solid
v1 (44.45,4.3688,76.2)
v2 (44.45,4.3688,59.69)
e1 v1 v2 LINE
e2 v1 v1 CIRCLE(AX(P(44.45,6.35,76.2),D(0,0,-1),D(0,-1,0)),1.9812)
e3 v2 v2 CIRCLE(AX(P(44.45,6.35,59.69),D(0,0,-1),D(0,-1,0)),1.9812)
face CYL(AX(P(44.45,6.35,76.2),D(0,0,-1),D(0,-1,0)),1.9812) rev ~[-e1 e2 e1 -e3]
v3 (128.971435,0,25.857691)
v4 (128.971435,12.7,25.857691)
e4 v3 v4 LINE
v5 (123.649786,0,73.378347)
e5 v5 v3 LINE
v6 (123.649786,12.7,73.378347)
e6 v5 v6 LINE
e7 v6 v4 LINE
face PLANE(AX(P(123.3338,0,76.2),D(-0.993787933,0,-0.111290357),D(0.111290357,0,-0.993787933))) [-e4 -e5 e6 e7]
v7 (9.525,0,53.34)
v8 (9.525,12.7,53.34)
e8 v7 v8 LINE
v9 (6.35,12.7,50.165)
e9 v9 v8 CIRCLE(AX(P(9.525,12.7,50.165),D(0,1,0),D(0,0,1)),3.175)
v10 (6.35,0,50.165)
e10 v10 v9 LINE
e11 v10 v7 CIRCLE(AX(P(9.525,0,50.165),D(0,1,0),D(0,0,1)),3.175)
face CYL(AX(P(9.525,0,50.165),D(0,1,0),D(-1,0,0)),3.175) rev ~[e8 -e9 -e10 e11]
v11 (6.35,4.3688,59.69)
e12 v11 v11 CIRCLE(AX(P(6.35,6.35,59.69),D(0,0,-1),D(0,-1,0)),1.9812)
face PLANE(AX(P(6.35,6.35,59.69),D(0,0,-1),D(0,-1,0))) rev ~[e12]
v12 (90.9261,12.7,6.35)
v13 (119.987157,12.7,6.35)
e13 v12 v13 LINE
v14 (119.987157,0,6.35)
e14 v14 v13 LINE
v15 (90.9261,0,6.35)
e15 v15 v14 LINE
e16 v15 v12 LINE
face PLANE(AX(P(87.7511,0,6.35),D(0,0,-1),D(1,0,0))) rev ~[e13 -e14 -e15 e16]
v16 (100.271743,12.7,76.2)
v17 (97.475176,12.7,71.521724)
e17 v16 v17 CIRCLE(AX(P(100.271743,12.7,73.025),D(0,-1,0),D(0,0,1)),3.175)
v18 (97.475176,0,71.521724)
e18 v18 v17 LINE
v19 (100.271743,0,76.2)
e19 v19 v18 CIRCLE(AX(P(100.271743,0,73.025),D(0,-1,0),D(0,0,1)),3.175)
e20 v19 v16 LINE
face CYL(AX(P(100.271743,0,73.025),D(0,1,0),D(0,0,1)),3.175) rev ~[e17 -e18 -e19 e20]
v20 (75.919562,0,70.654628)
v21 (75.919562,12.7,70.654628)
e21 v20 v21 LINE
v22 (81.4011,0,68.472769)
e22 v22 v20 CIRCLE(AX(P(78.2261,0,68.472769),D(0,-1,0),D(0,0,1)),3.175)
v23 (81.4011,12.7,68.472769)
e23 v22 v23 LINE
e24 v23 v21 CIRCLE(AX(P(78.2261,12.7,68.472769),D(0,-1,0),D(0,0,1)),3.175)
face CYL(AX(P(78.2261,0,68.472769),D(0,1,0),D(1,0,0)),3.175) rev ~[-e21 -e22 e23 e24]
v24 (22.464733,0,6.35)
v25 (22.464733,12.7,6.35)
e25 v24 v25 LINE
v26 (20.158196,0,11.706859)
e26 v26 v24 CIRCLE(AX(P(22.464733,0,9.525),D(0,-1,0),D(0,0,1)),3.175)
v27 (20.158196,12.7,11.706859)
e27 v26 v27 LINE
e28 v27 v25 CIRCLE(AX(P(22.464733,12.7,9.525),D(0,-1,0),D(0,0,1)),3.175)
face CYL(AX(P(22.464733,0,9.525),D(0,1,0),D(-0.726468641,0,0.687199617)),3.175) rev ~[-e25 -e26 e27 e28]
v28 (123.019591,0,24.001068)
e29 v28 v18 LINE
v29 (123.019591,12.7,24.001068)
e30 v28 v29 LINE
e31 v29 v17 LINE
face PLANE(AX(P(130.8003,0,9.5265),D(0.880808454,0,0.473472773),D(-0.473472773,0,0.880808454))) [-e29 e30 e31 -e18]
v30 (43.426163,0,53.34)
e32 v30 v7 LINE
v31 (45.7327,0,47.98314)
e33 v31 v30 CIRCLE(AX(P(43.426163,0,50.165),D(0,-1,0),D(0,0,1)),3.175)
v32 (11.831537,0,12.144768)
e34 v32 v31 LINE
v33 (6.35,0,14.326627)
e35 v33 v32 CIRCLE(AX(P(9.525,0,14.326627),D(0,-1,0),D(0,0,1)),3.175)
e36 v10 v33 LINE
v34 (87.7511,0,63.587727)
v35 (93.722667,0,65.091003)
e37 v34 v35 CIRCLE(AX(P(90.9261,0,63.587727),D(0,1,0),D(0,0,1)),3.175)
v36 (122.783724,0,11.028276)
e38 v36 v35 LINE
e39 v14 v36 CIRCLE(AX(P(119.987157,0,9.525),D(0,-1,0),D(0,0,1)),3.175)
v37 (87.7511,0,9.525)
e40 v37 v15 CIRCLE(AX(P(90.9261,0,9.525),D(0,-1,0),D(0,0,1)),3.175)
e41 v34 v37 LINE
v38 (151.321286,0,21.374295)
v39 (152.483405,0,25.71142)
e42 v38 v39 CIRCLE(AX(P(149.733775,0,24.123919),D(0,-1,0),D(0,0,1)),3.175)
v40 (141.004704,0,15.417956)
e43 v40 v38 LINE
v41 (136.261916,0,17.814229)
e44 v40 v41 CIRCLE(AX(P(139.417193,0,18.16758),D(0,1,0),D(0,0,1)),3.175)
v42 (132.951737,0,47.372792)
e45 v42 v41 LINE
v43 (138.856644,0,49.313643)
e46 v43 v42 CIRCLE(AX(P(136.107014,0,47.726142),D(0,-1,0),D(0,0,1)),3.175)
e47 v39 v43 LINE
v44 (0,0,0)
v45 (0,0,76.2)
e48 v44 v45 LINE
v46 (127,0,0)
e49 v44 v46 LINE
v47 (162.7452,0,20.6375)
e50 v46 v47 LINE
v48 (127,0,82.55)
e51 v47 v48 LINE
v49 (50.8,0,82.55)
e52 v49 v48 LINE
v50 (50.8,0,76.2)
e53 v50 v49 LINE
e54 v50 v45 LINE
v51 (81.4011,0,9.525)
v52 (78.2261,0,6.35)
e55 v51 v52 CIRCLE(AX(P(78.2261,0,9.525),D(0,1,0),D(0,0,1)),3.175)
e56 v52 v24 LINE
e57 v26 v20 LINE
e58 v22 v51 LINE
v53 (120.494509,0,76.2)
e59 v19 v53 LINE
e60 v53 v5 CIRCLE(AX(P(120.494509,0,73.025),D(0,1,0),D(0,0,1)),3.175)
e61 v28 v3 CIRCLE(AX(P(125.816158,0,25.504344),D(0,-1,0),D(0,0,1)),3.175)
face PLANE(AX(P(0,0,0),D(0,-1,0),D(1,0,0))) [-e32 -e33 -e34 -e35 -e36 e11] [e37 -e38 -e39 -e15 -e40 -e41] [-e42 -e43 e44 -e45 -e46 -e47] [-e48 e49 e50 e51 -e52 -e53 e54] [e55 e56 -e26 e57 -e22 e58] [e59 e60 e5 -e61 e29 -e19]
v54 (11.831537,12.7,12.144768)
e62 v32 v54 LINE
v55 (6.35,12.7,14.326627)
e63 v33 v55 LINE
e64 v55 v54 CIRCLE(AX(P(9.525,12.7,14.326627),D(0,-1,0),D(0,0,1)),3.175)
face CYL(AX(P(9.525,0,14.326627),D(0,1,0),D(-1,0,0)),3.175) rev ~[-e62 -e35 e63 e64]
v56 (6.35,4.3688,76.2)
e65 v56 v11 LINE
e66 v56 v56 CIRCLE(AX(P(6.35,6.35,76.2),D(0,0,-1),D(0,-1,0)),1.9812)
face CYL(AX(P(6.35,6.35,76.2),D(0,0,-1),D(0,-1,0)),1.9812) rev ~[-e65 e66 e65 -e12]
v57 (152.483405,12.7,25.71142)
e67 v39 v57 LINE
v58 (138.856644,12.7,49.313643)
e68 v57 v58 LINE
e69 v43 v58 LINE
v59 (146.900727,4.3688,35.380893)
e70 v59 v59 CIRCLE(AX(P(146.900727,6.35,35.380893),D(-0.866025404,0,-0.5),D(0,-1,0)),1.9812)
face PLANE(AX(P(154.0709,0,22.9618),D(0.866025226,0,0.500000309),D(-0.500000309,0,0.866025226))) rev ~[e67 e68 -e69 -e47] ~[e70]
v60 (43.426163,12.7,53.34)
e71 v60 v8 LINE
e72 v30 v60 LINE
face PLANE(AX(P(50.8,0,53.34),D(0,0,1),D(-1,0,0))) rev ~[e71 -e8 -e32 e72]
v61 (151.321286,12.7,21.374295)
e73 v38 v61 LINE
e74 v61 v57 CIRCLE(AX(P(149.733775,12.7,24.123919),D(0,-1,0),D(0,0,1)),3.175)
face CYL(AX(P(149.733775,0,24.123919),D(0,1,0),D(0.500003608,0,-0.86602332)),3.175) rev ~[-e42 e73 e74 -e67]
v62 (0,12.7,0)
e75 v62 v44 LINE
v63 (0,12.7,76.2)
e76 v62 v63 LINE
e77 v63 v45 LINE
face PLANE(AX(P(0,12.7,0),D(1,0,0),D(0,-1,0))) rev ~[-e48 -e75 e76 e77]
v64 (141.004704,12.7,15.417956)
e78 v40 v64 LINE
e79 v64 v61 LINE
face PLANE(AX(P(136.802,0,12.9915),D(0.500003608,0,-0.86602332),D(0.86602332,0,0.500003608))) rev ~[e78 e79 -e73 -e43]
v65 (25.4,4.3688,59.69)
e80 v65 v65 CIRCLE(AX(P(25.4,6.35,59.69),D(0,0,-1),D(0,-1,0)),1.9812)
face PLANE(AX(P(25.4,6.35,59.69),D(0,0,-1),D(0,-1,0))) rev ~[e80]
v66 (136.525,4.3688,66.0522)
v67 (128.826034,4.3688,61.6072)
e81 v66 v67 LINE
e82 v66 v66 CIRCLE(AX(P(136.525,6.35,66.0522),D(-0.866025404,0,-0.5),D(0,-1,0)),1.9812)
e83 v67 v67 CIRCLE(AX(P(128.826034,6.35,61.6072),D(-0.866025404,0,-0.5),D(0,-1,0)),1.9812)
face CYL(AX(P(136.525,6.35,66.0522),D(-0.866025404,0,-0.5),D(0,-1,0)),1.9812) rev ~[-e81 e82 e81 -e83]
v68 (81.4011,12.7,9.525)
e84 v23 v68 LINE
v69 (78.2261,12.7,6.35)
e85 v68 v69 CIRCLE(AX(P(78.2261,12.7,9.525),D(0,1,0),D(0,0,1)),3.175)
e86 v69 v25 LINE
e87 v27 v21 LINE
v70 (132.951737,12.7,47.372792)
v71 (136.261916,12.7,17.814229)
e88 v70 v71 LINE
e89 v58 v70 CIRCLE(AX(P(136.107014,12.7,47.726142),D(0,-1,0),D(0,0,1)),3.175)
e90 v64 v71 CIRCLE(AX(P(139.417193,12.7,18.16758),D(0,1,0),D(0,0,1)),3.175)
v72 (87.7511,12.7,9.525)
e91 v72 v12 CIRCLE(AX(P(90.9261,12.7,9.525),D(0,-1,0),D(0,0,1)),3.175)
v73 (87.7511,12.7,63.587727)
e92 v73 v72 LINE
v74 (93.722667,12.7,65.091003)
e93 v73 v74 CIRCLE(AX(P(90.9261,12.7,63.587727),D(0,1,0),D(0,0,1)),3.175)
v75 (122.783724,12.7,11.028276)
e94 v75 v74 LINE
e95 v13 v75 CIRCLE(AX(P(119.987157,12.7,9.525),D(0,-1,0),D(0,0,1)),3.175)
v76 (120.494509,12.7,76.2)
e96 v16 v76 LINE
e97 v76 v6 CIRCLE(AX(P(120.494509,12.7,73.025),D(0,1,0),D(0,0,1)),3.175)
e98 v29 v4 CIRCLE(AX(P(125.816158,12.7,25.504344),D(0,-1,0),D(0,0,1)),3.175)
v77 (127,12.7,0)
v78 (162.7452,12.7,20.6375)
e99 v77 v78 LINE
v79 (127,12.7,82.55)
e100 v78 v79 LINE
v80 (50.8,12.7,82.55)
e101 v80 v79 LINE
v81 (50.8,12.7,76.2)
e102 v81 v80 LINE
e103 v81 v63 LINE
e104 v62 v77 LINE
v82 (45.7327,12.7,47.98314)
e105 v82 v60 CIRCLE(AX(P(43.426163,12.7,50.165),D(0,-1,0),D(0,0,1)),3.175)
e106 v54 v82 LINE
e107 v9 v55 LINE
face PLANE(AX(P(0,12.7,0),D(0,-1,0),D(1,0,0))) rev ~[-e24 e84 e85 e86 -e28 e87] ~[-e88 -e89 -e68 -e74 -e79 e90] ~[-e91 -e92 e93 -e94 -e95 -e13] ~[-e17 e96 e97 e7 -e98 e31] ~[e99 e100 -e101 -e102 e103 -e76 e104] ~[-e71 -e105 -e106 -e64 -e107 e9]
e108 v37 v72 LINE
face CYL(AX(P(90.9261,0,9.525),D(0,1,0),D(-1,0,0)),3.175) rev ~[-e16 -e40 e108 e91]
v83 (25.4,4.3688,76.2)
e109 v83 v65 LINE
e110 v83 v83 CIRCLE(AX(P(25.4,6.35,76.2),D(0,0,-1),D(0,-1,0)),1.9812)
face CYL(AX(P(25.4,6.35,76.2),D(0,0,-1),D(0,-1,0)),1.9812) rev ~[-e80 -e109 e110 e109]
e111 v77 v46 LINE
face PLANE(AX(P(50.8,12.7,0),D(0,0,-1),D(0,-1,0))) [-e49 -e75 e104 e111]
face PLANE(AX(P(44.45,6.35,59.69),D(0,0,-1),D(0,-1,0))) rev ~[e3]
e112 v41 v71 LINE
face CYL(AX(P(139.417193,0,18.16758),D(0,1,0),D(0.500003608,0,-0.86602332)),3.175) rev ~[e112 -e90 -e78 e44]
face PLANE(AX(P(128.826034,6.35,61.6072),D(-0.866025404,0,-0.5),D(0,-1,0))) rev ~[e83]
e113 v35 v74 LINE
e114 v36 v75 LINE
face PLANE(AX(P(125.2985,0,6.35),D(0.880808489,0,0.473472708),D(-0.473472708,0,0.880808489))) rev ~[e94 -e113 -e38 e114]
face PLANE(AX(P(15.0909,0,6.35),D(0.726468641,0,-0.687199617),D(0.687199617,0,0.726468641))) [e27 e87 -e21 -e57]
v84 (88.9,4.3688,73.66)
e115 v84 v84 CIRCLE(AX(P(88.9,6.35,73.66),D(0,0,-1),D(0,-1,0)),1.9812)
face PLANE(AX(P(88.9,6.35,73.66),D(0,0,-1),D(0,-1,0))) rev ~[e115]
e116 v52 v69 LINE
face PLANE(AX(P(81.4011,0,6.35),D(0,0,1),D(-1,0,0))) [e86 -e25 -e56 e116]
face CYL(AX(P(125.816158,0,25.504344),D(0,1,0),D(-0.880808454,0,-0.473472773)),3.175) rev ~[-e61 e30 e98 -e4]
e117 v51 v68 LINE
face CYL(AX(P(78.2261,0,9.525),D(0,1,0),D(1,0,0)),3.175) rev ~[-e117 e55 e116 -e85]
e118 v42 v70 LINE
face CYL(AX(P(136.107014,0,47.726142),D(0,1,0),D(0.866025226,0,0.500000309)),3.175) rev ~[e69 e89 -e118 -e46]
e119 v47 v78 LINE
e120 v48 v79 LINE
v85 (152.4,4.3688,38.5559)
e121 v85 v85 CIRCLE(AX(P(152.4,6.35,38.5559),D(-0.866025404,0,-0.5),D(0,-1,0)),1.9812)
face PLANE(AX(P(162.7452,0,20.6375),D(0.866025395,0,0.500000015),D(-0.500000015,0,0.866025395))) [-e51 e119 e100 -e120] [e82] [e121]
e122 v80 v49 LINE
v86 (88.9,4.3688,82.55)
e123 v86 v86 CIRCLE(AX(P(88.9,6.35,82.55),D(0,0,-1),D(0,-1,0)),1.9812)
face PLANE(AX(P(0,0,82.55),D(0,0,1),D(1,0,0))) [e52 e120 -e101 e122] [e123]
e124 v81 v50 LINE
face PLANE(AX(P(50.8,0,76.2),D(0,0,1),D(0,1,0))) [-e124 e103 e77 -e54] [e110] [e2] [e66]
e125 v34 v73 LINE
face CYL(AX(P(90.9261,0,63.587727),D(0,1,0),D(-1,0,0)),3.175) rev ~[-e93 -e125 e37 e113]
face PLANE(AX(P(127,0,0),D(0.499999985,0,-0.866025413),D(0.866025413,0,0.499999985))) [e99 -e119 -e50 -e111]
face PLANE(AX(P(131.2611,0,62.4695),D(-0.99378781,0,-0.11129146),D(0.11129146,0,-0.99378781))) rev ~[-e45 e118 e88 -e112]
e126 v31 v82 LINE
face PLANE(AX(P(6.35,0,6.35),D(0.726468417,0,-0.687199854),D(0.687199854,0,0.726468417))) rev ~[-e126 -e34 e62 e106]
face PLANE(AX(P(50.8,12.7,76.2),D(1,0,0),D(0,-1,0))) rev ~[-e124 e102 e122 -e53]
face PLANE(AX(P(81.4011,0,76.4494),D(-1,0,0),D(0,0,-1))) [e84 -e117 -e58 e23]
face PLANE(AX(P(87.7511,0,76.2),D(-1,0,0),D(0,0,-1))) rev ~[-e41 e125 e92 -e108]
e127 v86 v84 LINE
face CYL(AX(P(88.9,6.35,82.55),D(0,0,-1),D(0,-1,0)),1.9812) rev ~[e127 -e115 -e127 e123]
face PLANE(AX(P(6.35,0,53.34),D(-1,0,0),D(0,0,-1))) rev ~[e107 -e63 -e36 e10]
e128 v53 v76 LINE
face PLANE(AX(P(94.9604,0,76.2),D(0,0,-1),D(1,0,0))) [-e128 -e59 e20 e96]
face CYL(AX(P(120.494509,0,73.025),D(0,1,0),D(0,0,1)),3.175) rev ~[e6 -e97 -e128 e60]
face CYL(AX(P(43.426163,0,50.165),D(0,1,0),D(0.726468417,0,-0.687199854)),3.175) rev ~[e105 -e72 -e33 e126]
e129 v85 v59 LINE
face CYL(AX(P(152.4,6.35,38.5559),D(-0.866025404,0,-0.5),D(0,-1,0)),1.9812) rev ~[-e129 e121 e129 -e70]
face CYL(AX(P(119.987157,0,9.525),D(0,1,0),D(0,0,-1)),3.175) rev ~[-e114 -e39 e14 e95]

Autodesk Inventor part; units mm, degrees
ref_plane "YZ Plane" through (0, 0, 0) normal (1, 0, 0) x (0, 1, 0)
ref_plane "XZ Plane" through (0, 0, 0) normal (0, 1, 0) x (-1, 0, 0)
ref_plane "XY Plane" through (0, 0, 0) normal (0, 0, 1) x (1, 0, 0)
sketch "Sketch1" plane through (0, 0, 0) normal (0, 0, 1) x (1, 0, 0)
  line L0 (0, 0) -> (50.8, 0)
  line L1 (50.8, 0) -> (50.8, 12.7)
  line L2 (50.8, 12.7) -> (0, 12.7)
  line L3 (0, 12.7) -> (0, 0)
  dimension "d0" = 50.8
  dimension "d1" = 12.7
extrude "Extrusion1" add sketch "Sketch1" along normal blind 76.2
sketch "Sketch2" plane through (0, 0, 76.2) normal (0, 0, 1) x (1, 0, 0)
  line L0 (50.8, 12.7) -> (0, 12.7) construction
  line L1 (50.8, 0) -> (50.8, 12.7) construction
  line L2 (0, 12.7) -> (50.8, 12.7) construction
  line L3 (50.8, 12.7) -> (50.8, 6.35) construction
  line L4 (50.8, 6.35) -> (0, 6.35) construction
  line L5 (0, 6.35) -> (0, 12.7) construction
  point P0 (0, 0)
  point P1 (25.4, 6.35)
  point P2 (6.35, 6.35)
  point P3 (44.45, 6.35)
  dimension "d4" = 6.35
  dimension "d5" = 19.05
  dimension "d6" = 19.05
hole "Hole1" at (25.4, 6.35, 76.2) at (6.35, 6.35, 76.2) at (44.45, 6.35, 76.2) direction (0, 0, -1) diameter 3.9624 depth 16.51 thread size "10-32 UNF" class "2B" standard "ANSI Unified Screw Threads"
sketch "Sketch3" plane through (50.8, 0, 0) normal (1, 0, 0) x (0, 0, -1)
  line L0 (0, 0) -> (-76.2, 0) projected
  line L1 (-76.2, 0) -> (-76.2, 12.7) projected
  line L2 (0, 0) -> (-76.2, 0)
  line L3 (-76.2, 0) -> (-76.2, 12.7)
  line L4 (-76.2, 12.7) -> (0, 12.7)
  line L5 (0, 12.7) -> (0, 0)
extrude "Extrusion2" add sketch "Sketch3" along normal blind 76.2
sketch "Sketch4" plane through (0, 0, 76.2) normal (0, 0, 1) x (1, 0, 0)
  line L0 (0, 12.7) -> (127, 12.7) projected
  line L1 (0, 0) -> (127, 0) projected
  line L2 (127, 12.7) -> (50.8, 12.7)
  line L3 (50.8, 12.7) -> (50.8, 0)
  line L4 (50.8, 0) -> (127, 0)
  line L5 (127, 0) -> (127, 12.7)
  dimension "d16" = 76.2
extrude "Extrusion3" add sketch "Sketch4" along normal blind 6.35
sketch "Sketch5" plane through (0, 0, 0) normal (0, -1, 0) x (1, 0, 0)
  line L0 (127, 0) -> (162.7452, 20.6375)
  line L1 (127, 0) -> (168.275, 0) construction
  line L2 (127, 0) -> (127, 82.55) projected
  line L3 (162.7452, 20.6375) -> (127, 82.55)
  line L4 (127, 82.55) -> (127, 0)
  point P0 (0, 0)
  dimension "d19" = 41.275
  dimension "d20" = 30
extrude "Extrusion4" add sketch "Sketch5" against normal up to surface (12.7 mm away)
sketch "Sketch6" plane through (0, 0, 76.2) normal (0, 1, 0) x (1, 0, 0)
  line L0 (4.3688, 16.51) -> (8.3312, 16.51) projected
  line L1 (8.3312, 0) -> (4.3688, 0) projected
  line L2 (8.3312, 0) -> (4.3688, 0) projected
  line L3 (4.3688, 16.51) -> (8.3312, 16.51) projected
  line L4 (0, 76.2) -> (0, 0) projected
  line L5 (0, 16.51) -> (50.8, 16.51)
  line L6 (50.8, 0) -> (50.8, -6.35) projected
  line L7 (50.8, 16.51) -> (50.8, 0)
  line L8 (0, 76.2) -> (127, 76.2) projected
  line L9 (6.35, 22.86) -> (6.35, 69.85)
  line L10 (6.35, 69.85) -> (50.8, 22.86)
  line L11 (50.8, 22.86) -> (6.35, 22.86)
  line L12 (57.15, 16.1471) -> (57.15, 0)
  line L13 (57.15, 0) -> (72.4243, 0)
  line L14 (72.4243, 0) -> (57.15, 16.1471)
  line L15 (127, -6.35) -> (50.8, -6.35) projected
  line L16 (6.35, 69.85) -> (10.9631, 74.2137) construction
  line L17 (10.9631, 74.2137) -> (15.0909, 69.85) construction
  line L18 (15.0909, 69.85) -> (81.4011, -0.2494)
  line L19 (81.4011, -0.2494) -> (81.4011, 69.85)
  line L20 (81.4011, 69.85) -> (15.0909, 69.85)
  line L21 (127, 76.2) -> (162.7452, 55.5625) projected
  line L22 (72.4243, 0) -> (77.0374, 4.3637) construction
  line L23 (77.0374, 4.3637) -> (81.4011, -0.2494) construction
  line L24 (87.7511, 0) -> (87.7511, 69.85)
  line L25 (87.7511, 69.85) -> (125.2985, 69.85)
  line L26 (125.2985, 69.85) -> (87.7511, 0)
  line L27 (130.8003, 66.6735) -> (94.9604, 0)
  line L28 (94.9604, 0) -> (123.3338, 0)
  line L29 (123.3338, 0) -> (130.8003, 66.6735)
  line L30 (162.7452, 55.5625) -> (127, -6.35) projected
  line L31 (136.802, 63.2085) -> (154.0709, 53.2382)
  line L32 (154.0709, 53.2382) -> (131.2611, 13.7305)
  line L33 (131.2611, 13.7305) -> (136.802, 63.2085)
  point P0 (6.35, 16.51)
  point P1 (57.15, 8.0736)
  point P2 (145.4365, 58.2234)
  dimension "d23" = 50.8
  dimension "d24" = 6.35
  dimension "d25" = 6.35
  dimension "d26" = 6.35
  dimension "d27" = 6.35
  dimension "d28" = 0
  dimension "d29" = 6.35
  dimension "d30" = 6.35
  dimension "d31" = 6.35
  dimension "d33" = 6.35
  dimension "d34" = 6.35
  dimension "d39" = 6.35
  dimension "d40" = 6.35
  dimension "d41" = 6.35
  dimension "d42" = 6.35
  dimension "d43" = 6.35
  dimension "d44" = 6.35
  dimension "d45" = 6.35
  dimension "d46" = 6.35
  dimension "d47" = 6.35
  dimension "d48" = 6.35
  dimension "d49" = 6.35
  dimension "d50" = 6.35
  dimension "d51" = 6.35
extrude "Extrusion5" cut sketch "Sketch6" along normal through all contours L9 L10 L11 | L20 L19 L18 | L24 L25 L26 | L29 L28 L27 | L31 L32 L33
fillet "Fillet1" radius 3.175 15 edges at (130.8003, 6.35, 9.5265) (136.802, 6.35, 12.9915) (154.0709, 6.35, 22.9618) (131.2611, 6.35, 62.4695) (94.9604, 6.35, 76.2) (123.3338, 6.35, 76.2) (125.2985, 6.35, 6.35) (87.7511, 6.35, 6.35) (87.7511, 6.35, 76.2) (81.4011, 6.35, 76.4494) (81.4011, 6.35, 6.35) (15.0909, 6.35, 6.35) (6.35, 6.35, 53.34) (50.8, 6.35, 53.34) (6.35, 6.35, 6.35)
sketch "Sketch7" plane through (0, 0, 82.55) normal (0, 0, 1) x (1, 0, 0)
  line L0 (127, 0) -> (127, 12.7) construction
  line L1 (127, 6.35) -> (50.8, 6.35) construction
  line L2 (50.8, 12.7) -> (50.8, 0) construction
  point P0 (0, 0)
  point P1 (88.9, 6.35)
hole "Hole2" at (88.9, 6.35, 82.55) direction (0, 0, -1) diameter 3.9624 depth 8.89 thread size "10-32 UNF" class "2B" standard "ANSI Unified Screw Threads"
sketch "Sketch8" plane through (127, 0, 82.55) normal (0.8660254, 0, 0.5) x (0.5, 0, -0.8660254)
  line L0 (0, 0) -> (0, 12.7) construction
  line L1 (71.4904, 0) -> (71.4904, 12.7) construction
  line L2 (61.9654, 12.7) -> (34.7119, 12.7) construction
  point P0 (7.9904, 0)
  point P1 (19.05, 6.35)
  point P2 (50.8, 6.35)
  dimension "d69" = 19.05
  dimension "d70" = 31.75
hole "Hole3" at (136.525, 6.35, 66.0522) at (152.4, 6.35, 38.5559) direction (-0.8660254, 0, -0.5) diameter 3.9624 depth 8.89 thread size "10-32 UNF" class "2B" standard "ANSI Unified Screw Threads"
sketch "Sketch9" plane through (0, 0, 0) normal (-1, 0, 0) x (0, 0, 1)
  line L0 (0, 12.7) -> (0, 0) construction
  line L1 (0, 6.35) -> (76.2, 6.35) construction
  point P0 (19.05, 6.35)
  point P1 (44.45, 6.35)
  point P2 (31.75, 6.35)
  dimension "d71" = 25.4
  dimension "d72" = 19.05
  dimension "d73" = 12.7
hole "Hole4" [suppressed]
chamfer "Chamfer1" [suppressed]
sketch "Sketch10" plane through (0, 0, 0) normal (0, -1, 0) x (1, 0, 0)
  line L0 (78.2261, 6.35) -> (22.4648, 6.35) construction
  line L1 (78.2261, 6.35) -> (81.4011, 6.35) construction
  arc A0 (78.2261, 6.35) -> (81.4011, 9.525) centre (78.2261, 9.525) ccw construction
  line L2 (81.4011, 6.35) -> (81.4011, 9.525) construction
  point P0 (0, 0)
  dimension "d84" = 3.175
sketch "Sketch11" plane through (0, 12.7, 76.2) normal (0, 1, 0) x (1, 0, 0)
  line L0 (78.2261, 69.85) -> (81.4011, 69.85) construction
  line L1 (81.4011, 69.85) -> (81.4011, 66.675) construction
  point P0 (0, 76.2)
properties part number "Third Baseplate"
